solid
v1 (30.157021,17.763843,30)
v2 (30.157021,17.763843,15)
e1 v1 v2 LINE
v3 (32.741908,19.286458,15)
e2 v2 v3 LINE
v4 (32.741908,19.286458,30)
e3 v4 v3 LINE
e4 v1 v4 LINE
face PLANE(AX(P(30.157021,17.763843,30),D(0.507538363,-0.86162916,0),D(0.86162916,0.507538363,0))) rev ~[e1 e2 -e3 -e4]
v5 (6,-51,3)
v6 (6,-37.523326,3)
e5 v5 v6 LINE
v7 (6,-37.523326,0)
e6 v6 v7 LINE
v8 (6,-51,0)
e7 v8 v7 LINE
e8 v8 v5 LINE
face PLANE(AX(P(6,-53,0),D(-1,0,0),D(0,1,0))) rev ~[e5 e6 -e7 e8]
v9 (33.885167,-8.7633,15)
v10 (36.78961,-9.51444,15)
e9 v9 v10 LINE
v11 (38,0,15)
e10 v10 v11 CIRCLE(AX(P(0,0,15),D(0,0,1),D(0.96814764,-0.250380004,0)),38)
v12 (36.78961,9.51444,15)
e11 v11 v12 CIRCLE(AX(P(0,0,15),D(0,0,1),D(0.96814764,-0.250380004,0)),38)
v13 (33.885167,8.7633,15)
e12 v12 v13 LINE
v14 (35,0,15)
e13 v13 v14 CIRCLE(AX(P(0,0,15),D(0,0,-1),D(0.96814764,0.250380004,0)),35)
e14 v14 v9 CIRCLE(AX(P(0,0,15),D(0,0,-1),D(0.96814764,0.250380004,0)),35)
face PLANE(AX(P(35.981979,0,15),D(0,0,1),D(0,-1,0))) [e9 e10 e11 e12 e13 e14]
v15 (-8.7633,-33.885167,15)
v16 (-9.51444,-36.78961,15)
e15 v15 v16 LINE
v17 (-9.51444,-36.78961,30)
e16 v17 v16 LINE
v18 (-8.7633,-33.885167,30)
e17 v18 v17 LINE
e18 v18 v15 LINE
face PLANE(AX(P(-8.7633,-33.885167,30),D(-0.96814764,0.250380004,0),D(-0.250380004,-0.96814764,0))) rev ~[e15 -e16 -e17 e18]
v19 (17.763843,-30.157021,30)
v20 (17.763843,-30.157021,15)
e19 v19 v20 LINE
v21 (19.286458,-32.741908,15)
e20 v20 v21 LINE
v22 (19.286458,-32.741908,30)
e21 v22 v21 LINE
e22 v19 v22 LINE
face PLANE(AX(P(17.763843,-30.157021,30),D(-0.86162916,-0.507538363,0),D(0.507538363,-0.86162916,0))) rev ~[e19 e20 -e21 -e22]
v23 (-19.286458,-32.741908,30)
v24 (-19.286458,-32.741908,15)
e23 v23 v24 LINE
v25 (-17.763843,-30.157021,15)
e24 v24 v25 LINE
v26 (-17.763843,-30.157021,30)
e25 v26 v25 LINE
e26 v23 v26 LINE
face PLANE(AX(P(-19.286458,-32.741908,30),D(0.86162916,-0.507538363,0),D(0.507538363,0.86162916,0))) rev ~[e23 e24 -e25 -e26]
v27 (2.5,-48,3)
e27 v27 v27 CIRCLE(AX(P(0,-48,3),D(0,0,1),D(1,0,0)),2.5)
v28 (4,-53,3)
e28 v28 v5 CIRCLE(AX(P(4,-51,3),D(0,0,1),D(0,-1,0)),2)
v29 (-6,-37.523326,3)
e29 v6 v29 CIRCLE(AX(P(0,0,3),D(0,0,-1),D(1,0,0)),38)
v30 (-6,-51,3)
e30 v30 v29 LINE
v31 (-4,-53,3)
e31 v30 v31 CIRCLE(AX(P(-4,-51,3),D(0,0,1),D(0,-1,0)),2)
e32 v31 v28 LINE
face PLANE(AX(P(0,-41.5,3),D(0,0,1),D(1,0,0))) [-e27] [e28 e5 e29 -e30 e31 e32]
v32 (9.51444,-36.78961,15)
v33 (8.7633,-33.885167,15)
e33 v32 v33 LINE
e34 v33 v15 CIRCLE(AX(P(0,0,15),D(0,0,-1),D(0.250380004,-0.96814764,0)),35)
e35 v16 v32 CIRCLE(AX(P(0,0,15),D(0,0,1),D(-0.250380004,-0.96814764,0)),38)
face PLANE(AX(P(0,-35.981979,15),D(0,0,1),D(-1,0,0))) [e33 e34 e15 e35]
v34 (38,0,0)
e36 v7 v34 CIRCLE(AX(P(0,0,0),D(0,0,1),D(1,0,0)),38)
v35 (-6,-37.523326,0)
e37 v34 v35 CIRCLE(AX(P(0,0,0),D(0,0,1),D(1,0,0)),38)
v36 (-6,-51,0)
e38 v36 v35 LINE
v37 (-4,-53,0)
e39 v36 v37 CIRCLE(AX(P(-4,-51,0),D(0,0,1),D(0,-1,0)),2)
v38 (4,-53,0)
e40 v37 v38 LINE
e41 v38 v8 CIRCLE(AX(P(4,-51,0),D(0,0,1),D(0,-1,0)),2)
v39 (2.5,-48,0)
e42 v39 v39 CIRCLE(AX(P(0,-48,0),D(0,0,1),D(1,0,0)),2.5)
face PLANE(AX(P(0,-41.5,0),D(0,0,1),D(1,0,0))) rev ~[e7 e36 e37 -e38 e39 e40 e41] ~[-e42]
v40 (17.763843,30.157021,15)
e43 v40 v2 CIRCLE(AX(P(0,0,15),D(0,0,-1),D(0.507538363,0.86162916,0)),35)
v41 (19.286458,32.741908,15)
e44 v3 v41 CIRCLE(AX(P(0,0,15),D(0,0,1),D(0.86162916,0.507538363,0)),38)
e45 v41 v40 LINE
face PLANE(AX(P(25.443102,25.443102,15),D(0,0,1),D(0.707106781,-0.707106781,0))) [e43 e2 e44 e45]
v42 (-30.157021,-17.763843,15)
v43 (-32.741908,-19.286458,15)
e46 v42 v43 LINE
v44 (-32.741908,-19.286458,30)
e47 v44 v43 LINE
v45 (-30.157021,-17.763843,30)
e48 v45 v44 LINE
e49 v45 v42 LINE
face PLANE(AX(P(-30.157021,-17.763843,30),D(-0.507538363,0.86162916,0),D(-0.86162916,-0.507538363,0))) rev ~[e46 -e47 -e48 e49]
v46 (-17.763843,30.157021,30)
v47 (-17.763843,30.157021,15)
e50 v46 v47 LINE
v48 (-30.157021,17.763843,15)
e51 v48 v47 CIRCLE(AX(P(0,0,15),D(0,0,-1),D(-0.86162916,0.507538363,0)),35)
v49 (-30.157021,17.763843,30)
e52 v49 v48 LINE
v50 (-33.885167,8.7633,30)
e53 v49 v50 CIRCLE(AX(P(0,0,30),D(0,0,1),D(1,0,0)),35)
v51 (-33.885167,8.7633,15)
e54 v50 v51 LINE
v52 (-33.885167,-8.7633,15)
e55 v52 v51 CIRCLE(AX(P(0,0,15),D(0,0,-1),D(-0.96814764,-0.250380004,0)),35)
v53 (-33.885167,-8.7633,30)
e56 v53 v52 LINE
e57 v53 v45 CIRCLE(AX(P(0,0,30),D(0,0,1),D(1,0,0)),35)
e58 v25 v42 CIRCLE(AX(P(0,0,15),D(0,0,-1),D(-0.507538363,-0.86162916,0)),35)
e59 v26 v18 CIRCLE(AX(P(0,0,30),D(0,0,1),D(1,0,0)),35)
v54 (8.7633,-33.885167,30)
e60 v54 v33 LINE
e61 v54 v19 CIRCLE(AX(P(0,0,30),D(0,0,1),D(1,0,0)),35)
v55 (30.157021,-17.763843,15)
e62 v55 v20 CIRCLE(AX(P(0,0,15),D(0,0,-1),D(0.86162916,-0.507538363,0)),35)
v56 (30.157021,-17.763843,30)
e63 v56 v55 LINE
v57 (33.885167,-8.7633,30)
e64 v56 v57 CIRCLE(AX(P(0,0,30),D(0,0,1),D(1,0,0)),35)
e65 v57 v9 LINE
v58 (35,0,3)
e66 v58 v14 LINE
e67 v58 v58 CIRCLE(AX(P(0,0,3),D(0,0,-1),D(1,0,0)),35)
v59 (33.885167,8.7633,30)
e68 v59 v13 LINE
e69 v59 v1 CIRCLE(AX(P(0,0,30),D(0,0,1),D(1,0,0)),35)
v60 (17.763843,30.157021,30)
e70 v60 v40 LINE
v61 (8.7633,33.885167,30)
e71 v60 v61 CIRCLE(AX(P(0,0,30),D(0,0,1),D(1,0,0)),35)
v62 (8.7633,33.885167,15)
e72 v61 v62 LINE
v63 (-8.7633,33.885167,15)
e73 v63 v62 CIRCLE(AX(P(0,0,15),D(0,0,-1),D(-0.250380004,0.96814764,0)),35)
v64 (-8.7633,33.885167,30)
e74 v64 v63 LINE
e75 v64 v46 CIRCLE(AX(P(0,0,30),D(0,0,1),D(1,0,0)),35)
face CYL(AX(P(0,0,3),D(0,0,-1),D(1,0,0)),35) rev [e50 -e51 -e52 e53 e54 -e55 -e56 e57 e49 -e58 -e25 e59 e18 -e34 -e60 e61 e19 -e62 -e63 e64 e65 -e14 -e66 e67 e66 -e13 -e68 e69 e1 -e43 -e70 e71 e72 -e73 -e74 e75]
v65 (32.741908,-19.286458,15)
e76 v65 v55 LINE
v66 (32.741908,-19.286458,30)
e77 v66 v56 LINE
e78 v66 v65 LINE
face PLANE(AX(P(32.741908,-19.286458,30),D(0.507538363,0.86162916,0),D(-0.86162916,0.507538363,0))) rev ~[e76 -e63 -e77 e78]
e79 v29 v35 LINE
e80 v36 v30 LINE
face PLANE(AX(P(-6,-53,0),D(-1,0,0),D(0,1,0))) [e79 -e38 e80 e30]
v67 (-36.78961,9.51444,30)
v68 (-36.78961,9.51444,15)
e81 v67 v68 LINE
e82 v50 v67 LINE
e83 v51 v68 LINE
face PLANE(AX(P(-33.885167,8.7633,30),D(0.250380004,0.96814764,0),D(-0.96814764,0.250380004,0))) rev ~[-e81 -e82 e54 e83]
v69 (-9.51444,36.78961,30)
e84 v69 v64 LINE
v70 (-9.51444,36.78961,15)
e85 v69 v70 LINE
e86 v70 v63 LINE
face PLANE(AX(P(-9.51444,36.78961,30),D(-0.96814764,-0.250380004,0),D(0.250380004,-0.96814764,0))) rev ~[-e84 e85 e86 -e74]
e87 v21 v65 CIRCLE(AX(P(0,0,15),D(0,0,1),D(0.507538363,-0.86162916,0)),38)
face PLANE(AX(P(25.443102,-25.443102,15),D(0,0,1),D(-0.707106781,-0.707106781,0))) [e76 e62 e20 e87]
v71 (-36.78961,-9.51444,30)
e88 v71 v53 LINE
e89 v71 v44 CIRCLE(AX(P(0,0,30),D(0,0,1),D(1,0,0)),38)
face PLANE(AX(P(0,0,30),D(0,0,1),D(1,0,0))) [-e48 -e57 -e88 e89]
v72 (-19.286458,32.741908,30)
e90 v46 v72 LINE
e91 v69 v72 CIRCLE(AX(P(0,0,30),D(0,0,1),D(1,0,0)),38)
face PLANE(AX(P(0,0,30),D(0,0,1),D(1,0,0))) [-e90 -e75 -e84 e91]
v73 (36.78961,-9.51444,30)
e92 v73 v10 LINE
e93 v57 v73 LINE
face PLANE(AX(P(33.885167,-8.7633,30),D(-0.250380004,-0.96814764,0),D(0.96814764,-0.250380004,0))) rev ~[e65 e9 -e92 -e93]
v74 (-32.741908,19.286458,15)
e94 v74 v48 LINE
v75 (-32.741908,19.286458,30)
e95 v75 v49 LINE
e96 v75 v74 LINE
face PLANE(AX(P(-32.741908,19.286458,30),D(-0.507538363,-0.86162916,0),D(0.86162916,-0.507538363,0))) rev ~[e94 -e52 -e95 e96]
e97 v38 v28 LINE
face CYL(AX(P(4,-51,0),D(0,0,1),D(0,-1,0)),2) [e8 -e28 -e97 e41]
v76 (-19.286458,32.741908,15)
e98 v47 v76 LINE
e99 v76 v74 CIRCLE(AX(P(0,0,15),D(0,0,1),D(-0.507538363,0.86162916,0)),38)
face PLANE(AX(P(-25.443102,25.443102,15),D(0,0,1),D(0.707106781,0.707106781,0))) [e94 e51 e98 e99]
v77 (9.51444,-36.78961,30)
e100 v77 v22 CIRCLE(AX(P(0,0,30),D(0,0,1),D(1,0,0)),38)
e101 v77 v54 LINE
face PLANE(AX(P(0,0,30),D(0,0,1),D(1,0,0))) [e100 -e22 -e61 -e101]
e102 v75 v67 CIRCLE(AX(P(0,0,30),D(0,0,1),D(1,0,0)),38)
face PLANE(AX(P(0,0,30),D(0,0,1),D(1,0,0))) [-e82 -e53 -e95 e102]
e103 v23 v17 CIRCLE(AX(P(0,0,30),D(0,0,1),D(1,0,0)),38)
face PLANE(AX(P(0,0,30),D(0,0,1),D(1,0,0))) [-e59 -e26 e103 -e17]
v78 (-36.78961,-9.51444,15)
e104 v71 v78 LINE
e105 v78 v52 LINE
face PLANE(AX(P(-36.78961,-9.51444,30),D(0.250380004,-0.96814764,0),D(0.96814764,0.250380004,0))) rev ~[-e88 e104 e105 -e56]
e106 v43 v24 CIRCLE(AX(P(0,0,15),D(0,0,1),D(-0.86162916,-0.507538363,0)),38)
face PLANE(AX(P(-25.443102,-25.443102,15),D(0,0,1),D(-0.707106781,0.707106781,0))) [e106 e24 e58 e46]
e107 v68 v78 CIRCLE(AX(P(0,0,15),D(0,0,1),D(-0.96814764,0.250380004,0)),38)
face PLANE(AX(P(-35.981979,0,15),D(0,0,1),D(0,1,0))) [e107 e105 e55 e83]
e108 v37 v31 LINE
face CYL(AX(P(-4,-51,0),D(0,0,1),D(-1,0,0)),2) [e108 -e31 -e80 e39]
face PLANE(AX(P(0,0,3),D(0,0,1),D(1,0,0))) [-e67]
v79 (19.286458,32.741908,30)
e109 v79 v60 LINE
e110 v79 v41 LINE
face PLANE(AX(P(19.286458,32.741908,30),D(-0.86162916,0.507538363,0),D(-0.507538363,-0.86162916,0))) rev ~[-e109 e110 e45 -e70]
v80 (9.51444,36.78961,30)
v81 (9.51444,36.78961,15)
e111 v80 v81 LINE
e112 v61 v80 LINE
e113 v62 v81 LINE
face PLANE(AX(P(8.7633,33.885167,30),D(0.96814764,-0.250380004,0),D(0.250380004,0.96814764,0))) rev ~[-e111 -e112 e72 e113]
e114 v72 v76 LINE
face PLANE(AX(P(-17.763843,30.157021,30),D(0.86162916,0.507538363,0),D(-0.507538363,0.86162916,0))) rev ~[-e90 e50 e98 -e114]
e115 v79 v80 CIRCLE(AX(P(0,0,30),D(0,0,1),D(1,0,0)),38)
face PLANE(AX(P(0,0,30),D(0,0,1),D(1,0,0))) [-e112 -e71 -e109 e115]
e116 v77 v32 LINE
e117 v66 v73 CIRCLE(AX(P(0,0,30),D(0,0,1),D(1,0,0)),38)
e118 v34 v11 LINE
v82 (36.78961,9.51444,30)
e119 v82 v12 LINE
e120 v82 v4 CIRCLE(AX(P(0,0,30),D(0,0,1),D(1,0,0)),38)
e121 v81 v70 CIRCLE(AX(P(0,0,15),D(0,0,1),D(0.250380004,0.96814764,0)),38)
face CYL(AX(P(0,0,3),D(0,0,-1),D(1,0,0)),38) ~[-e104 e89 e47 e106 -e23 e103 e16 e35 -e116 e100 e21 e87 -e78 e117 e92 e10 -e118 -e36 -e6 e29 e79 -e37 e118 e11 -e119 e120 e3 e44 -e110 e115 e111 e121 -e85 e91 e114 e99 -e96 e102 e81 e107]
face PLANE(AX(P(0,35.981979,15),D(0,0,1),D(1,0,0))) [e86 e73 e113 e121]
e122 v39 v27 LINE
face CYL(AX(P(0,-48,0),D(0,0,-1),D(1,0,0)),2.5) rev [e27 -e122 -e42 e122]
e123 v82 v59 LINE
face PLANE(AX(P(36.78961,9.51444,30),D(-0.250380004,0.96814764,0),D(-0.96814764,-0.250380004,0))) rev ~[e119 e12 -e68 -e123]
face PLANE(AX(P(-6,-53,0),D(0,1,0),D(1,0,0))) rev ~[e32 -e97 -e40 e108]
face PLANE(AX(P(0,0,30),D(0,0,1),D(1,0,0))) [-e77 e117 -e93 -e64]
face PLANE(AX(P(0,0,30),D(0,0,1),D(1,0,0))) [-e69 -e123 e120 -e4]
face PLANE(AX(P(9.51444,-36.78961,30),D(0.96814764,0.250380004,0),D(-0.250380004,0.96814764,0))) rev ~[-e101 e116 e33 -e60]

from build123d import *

# Parameters (mm, degrees)
F0_R            = 38
F1_DEPTH        = 3
F2_R            = 38
F2_R_2          = 35
F3_DEPTH        = 27
F4_W            = 12
F4_H            = 23
F4_R            = 2.5
F5_DEPTH        = 3
F6_R            = 2
F8_DEPTH        = 15
F8_COPIES_COUNT = 8


# Not quite as in the source:
# - a pattern or mirror of a feature is missing from the dataset's text; its kind, count and spacing are read off the source's solid


with BuildPart() as f1:
    # F0 (on Top) → F1 (new body)
    with BuildSketch(Plane.XY):
        Circle(F0_R)
    extrude(amount=F1_DEPTH)

    # F2 (on face) → F3 (join)
    with BuildSketch(Plane.XY.offset(3)):
        Circle(F2_R)
        Circle(F2_R_2, mode=Mode.SUBTRACT)
    extrude(amount=F3_DEPTH)

    # F4 (on Top) → F5 (join)
    with BuildSketch(Plane.XY):
        with Locations((0, -41.5)):
            Rectangle(F4_W, F4_H)
        with Locations((0, -48)):
            Circle(F4_R, mode=Mode.SUBTRACT)
    extrude(amount=F5_DEPTH)

    # F6
    f6_edges = [f1.edges().sort_by_distance(p)[0] for p in [
        (6, -53, 1.5),
        (-6, -53, 1.5),
    ]]
    fillet(f6_edges, radius=F6_R)

    # F7 (on face) → F8 (cut)
    with BuildSketch(Plane.XY.offset(30)):
        with BuildLine():
            Line((-9.5144401541, 36.7896103344), (-8.7633001419, 33.8851674132))
            ThreePointArc((-8.7633001419, 33.8851674132), (0, 35), (8.7633001419, 33.8851674132))
            Line((8.7633001419, 33.8851674132), (9.5144401541, 36.7896103344))
            ThreePointArc((9.5144401541, 36.7896103344), (0, 38), (-9.5144401541, 36.7896103344))
        make_face()
    f8 = extrude(amount=-F8_DEPTH, mode=Mode.SUBTRACT)

    # F8_copies: F8 ×8 about axis
    f8_copies_axis = Axis((0, 0, 0), (0, 0, 1))
    for i in range(1, F8_COPIES_COUNT):
        add(f8.rotate(f8_copies_axis, i * 360 / F8_COPIES_COUNT), mode=Mode.SUBTRACT)


solid = f1.part
